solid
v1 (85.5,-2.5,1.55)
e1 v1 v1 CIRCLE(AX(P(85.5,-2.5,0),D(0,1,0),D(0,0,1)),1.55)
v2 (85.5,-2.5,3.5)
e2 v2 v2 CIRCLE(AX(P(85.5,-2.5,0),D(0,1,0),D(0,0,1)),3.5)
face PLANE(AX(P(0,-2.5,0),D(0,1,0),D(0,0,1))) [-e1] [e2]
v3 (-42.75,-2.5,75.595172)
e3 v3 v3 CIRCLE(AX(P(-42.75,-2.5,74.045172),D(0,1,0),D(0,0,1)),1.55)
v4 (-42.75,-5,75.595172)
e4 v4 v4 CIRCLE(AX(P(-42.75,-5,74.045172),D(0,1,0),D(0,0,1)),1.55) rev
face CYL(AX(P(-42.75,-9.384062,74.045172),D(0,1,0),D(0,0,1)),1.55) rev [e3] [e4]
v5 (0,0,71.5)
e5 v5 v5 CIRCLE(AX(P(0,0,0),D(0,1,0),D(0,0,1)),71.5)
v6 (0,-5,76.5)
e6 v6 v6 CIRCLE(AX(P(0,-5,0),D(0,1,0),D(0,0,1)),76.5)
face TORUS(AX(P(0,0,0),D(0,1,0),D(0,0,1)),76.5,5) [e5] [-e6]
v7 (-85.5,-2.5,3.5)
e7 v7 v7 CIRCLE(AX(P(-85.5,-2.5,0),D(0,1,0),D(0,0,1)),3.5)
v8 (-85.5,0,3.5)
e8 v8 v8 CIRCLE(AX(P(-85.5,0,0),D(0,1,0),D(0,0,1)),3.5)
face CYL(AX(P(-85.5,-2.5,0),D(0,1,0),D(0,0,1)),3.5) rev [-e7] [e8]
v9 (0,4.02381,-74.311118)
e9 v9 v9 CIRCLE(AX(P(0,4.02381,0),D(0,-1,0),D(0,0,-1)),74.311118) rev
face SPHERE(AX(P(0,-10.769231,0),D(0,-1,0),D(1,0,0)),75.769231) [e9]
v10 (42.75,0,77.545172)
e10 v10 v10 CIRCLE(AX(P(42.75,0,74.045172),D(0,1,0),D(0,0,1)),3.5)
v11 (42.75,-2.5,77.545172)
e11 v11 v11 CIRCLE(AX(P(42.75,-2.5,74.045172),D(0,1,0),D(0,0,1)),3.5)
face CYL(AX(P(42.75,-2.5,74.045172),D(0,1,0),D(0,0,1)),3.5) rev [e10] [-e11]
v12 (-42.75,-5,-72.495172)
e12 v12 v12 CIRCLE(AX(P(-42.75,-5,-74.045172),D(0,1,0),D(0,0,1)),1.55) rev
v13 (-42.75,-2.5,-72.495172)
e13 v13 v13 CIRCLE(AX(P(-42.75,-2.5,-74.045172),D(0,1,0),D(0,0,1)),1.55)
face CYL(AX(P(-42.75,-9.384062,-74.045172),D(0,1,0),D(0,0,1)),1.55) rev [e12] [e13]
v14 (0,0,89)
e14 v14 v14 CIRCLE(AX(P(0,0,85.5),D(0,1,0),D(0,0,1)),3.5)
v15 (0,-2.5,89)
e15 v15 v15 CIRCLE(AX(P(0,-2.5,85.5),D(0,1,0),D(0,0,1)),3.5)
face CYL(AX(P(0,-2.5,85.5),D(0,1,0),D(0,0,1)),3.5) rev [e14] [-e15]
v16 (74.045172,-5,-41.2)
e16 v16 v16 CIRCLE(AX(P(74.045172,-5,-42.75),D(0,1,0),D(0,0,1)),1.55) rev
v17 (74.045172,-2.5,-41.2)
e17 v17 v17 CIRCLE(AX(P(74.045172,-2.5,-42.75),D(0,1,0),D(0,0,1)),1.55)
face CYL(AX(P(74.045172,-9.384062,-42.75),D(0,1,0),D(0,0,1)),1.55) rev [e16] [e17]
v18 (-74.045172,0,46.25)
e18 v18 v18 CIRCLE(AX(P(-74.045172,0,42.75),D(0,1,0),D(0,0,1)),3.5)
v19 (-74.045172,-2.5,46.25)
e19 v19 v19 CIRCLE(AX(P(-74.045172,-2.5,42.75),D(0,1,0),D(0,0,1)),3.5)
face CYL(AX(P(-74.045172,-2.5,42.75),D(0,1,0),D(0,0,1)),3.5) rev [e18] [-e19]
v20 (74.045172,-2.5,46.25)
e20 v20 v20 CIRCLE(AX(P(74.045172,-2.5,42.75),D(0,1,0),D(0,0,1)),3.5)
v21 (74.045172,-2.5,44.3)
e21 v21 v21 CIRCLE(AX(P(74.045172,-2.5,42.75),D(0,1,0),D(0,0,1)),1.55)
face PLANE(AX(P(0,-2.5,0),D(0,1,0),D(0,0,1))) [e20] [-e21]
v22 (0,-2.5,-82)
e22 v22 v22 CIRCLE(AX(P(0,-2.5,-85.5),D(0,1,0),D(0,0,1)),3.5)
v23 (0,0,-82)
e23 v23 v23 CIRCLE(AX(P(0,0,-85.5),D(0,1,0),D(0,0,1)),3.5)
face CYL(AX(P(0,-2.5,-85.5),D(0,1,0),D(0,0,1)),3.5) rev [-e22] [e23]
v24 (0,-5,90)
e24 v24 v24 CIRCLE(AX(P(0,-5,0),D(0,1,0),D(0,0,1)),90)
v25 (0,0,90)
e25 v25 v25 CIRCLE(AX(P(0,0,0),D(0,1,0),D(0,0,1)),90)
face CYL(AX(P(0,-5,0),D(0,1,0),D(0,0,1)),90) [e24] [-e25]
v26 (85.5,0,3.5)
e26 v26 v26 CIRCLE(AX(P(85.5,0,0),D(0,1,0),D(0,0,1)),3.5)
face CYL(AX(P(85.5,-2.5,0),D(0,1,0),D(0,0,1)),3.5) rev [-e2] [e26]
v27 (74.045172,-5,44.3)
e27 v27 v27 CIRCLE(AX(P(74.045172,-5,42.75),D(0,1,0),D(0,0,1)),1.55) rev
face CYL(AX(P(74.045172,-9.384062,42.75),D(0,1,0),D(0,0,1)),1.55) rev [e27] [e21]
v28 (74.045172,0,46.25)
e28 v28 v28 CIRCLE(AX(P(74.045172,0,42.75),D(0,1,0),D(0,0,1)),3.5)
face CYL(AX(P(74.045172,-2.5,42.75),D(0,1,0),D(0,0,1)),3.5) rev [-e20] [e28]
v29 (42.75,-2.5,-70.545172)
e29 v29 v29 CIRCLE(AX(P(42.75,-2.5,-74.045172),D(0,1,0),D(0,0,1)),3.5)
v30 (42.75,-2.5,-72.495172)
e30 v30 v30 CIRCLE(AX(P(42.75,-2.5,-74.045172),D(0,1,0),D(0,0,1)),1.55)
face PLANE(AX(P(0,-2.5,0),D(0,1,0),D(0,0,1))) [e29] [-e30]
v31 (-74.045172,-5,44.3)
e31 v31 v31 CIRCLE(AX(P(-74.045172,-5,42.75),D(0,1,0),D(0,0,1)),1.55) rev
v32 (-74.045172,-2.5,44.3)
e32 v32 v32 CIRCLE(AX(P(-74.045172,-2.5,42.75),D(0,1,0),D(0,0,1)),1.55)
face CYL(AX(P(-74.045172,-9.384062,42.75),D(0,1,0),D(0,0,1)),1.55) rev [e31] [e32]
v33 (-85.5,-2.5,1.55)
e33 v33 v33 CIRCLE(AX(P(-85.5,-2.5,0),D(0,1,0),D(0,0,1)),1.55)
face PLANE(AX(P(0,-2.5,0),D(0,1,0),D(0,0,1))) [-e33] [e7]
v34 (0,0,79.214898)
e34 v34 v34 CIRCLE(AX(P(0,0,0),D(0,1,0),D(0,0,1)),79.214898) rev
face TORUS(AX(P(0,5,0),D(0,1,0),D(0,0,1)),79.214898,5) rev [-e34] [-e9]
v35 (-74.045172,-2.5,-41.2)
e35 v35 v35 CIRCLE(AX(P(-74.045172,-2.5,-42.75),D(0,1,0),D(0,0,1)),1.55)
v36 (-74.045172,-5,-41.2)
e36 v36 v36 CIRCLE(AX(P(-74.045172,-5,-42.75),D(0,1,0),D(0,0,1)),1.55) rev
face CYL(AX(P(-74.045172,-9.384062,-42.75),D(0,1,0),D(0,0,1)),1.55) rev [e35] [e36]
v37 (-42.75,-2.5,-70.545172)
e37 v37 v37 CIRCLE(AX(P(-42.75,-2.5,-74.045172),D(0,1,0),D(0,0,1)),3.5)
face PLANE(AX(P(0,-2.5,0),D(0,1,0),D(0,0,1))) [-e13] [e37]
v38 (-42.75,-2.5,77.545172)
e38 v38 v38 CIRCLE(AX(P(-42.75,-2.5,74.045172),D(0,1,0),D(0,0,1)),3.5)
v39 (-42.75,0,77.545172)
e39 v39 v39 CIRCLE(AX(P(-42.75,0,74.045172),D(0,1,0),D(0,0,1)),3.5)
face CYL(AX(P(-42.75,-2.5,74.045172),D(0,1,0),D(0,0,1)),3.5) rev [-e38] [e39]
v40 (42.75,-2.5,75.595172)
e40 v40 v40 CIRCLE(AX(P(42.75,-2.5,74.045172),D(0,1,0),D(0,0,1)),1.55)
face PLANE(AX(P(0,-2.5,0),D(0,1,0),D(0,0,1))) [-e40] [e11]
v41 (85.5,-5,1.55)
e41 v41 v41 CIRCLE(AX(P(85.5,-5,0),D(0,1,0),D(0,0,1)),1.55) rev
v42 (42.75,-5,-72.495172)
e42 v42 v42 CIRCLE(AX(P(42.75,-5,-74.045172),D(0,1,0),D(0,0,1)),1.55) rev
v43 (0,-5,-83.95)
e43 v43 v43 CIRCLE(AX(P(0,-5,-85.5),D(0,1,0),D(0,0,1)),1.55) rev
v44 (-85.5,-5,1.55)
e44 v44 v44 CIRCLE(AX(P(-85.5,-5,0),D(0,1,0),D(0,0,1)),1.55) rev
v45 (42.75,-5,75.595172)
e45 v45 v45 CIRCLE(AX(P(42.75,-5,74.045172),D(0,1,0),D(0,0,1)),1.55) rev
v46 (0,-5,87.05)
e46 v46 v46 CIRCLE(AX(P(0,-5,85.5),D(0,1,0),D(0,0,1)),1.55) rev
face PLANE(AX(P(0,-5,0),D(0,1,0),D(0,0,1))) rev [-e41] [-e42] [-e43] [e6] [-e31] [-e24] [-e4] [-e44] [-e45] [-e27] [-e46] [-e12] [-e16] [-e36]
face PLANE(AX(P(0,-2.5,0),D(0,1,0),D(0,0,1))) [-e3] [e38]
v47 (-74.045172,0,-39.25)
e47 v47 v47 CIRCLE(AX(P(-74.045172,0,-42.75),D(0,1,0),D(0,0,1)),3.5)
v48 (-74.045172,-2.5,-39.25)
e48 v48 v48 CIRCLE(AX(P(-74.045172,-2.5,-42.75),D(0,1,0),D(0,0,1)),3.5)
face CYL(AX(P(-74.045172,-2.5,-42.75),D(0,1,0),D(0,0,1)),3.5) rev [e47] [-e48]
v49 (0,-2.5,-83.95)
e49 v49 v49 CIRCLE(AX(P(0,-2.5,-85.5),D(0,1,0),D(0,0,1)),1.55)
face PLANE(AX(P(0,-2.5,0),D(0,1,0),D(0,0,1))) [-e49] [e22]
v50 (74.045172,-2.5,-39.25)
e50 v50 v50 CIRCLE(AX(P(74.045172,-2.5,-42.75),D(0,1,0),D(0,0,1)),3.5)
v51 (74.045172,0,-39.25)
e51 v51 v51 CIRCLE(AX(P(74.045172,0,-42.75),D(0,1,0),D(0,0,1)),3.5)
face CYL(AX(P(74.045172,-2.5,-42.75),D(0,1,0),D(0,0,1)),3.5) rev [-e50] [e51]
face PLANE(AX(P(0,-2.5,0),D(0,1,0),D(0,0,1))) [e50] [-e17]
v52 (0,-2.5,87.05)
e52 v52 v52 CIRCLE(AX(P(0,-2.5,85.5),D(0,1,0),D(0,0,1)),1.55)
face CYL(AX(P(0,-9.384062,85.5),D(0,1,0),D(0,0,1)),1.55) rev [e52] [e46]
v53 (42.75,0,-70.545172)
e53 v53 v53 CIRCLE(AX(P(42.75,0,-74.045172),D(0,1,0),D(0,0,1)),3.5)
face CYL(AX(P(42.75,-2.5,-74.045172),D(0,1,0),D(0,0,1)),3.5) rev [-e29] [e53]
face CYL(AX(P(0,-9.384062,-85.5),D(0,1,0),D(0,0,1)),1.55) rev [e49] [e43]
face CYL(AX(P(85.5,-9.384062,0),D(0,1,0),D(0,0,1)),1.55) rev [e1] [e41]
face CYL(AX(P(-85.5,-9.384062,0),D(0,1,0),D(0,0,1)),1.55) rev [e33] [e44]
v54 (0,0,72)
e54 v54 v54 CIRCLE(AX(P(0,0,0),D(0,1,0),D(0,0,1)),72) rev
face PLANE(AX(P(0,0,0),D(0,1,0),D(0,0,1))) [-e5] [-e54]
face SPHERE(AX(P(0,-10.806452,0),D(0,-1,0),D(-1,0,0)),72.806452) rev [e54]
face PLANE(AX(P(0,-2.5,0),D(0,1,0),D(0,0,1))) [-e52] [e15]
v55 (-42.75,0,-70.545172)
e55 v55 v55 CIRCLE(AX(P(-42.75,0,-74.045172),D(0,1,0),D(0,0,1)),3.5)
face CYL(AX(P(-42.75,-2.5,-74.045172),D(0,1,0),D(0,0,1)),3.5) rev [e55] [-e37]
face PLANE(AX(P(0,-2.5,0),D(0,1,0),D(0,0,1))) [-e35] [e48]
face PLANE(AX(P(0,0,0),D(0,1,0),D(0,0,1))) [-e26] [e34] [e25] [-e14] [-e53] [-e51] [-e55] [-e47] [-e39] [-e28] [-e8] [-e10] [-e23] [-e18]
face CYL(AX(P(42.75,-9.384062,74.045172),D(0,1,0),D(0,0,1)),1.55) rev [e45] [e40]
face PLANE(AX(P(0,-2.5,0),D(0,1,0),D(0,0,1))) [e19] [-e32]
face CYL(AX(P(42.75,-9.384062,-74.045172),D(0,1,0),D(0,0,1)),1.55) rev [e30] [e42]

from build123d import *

# Parameters (mm, degrees)
SKETCH1_R           = 90
SKETCH1_R_2         = 71.5
BOSS_EXTRUDE1_DEPTH = 5
SKETCH1_4_R         = 1.55
CUT_EXTRUDE1_DEPTH  = 5
SKETCH1_5_R         = 3.5
SKETCH1_5_R_2       = 1.55
CUT_EXTRUDE2_DEPTH  = 2.5
FILLET1_R           = 5


with BuildPart() as part:
    # Sketch1 → Boss-Extrude1 (new body)
    with BuildSketch(Plane(origin=(0, 0, 0), x_dir=(1, 0, 0), z_dir=(0, 1, 0))):
        with Locations(Location((0, 0, 0), (0, 0, 270))):
            Circle(SKETCH1_R)
        with Locations(Location((0, 0, 0), (0, 0, 270))):
            Circle(SKETCH1_R_2, mode=Mode.SUBTRACT)
    extrude(amount=-BOSS_EXTRUDE1_DEPTH)

    # Sketch1<4> → Cut-Extrude1 (cut)
    with BuildSketch(Plane(origin=(0, 0, 0), x_dir=(1, 0, 0), z_dir=(0, 1, 0))):
        with Locations(Location((0, -85.5, 0), (0, 0, 270))):
            Circle(SKETCH1_4_R)
        with Locations(Location((-74.045172024, -42.75, 0), (0, 0, 270))):
            Circle(SKETCH1_4_R)
        with Locations(Location((-42.75, -74.045172024, 0), (0, 0, 270))):
            Circle(SKETCH1_4_R)
        with Locations(Location((-85.5, 0, 0), (0, 0, 270))):
            Circle(SKETCH1_4_R)
        with Locations(Location((-74.045172024, 42.75, 0), (0, 0, 270))):
            Circle(SKETCH1_4_R)
        with Locations(Location((-42.75, 74.045172024, 0), (0, 0, 270))):
            Circle(SKETCH1_4_R)
        with Locations(Location((0, 85.5, 0), (0, 0, 270))):
            Circle(SKETCH1_4_R)
        with Locations(Location((42.75, 74.045172024, 0), (0, 0, 270))):
            Circle(SKETCH1_4_R)
        with Locations(Location((74.045172024, 42.75, 0), (0, 0, 270))):
            Circle(SKETCH1_4_R)
        with Locations(Location((85.5, 0, 0), (0, 0, 270))):
            Circle(SKETCH1_4_R)
        with Locations(Location((74.045172024, -42.75, 0), (0, 0, 270))):
            Circle(SKETCH1_4_R)
        with Locations(Location((42.75, -74.045172024, 0), (0, 0, 270))):
            Circle(SKETCH1_4_R)
    extrude(amount=-CUT_EXTRUDE1_DEPTH, mode=Mode.SUBTRACT)

    # Sketch1<5> → Cut-Extrude2 (cut)
    # profile 1 of 12: a face of its own
    with BuildSketch(Plane(origin=(0, 0, 0), x_dir=(1, 0, 0), z_dir=(0, 1, 0))):
        with Locations(Location((-74.045172024, -42.75, 0), (0, 0, 270))):
            Circle(SKETCH1_5_R)
        with Locations(Location((-74.045172024, -42.75, 0), (0, 0, 270))):
            Circle(SKETCH1_5_R_2, mode=Mode.SUBTRACT)
    # profile 2 of 12: a face of its own
    with BuildSketch(Plane(origin=(0, 0, 0), x_dir=(1, 0, 0), z_dir=(0, 1, 0))):
        with Locations(Location((-85.5, 0, 0), (0, 0, 270))):
            Circle(SKETCH1_5_R)
        with Locations(Location((-85.5, 0, 0), (0, 0, 270))):
            Circle(SKETCH1_5_R_2, mode=Mode.SUBTRACT)
    # profile 3 of 12: a face of its own
    with BuildSketch(Plane(origin=(0, 0, 0), x_dir=(1, 0, 0), z_dir=(0, 1, 0))):
        with Locations(Location((-42.75, -74.045172024, 0), (0, 0, 270))):
            Circle(SKETCH1_5_R)
        with Locations(Location((-42.75, -74.045172024, 0), (0, 0, 270))):
            Circle(SKETCH1_5_R_2, mode=Mode.SUBTRACT)
    # profile 4 of 12: a face of its own
    with BuildSketch(Plane(origin=(0, 0, 0), x_dir=(1, 0, 0), z_dir=(0, 1, 0))):
        with Locations(Location((0, -85.5, 0), (0, 0, 270))):
            Circle(SKETCH1_5_R)
        with Locations(Location((0, -85.5, 0), (0, 0, 270))):
            Circle(SKETCH1_5_R_2, mode=Mode.SUBTRACT)
    # profile 5 of 12: a face of its own
    with BuildSketch(Plane(origin=(0, 0, 0), x_dir=(1, 0, 0), z_dir=(0, 1, 0))):
        with Locations(Location((-74.045172024, 42.75, 0), (0, 0, 270))):
            Circle(SKETCH1_5_R)
        with Locations(Location((-74.045172024, 42.75, 0), (0, 0, 270))):
            Circle(SKETCH1_5_R_2, mode=Mode.SUBTRACT)
    # profile 6 of 12: a face of its own
    with BuildSketch(Plane(origin=(0, 0, 0), x_dir=(1, 0, 0), z_dir=(0, 1, 0))):
        with Locations(Location((-42.75, 74.045172024, 0), (0, 0, 270))):
            Circle(SKETCH1_5_R)
        with Locations(Location((-42.75, 74.045172024, 0), (0, 0, 270))):
            Circle(SKETCH1_5_R_2, mode=Mode.SUBTRACT)
    # profile 7 of 12: a face of its own
    with BuildSketch(Plane(origin=(0, 0, 0), x_dir=(1, 0, 0), z_dir=(0, 1, 0))):
        with Locations(Location((0, 85.5, 0), (0, 0, 270))):
            Circle(SKETCH1_5_R)
        with Locations(Location((0, 85.5, 0), (0, 0, 270))):
            Circle(SKETCH1_5_R_2, mode=Mode.SUBTRACT)
    # profile 8 of 12: a face of its own
    with BuildSketch(Plane(origin=(0, 0, 0), x_dir=(1, 0, 0), z_dir=(0, 1, 0))):
        with Locations(Location((74.045172024, 42.75, 0), (0, 0, 270))):
            Circle(SKETCH1_5_R)
        with Locations(Location((74.045172024, 42.75, 0), (0, 0, 270))):
            Circle(SKETCH1_5_R_2, mode=Mode.SUBTRACT)
    # profile 9 of 12: a face of its own
    with BuildSketch(Plane(origin=(0, 0, 0), x_dir=(1, 0, 0), z_dir=(0, 1, 0))):
        with Locations(Location((42.75, 74.045172024, 0), (0, 0, 270))):
            Circle(SKETCH1_5_R)
        with Locations(Location((42.75, 74.045172024, 0), (0, 0, 270))):
            Circle(SKETCH1_5_R_2, mode=Mode.SUBTRACT)
    # profile 10 of 12: a face of its own
    with BuildSketch(Plane(origin=(0, 0, 0), x_dir=(1, 0, 0), z_dir=(0, 1, 0))):
        with Locations(Location((74.045172024, -42.75, 0), (0, 0, 270))):
            Circle(SKETCH1_5_R)
        with Locations(Location((74.045172024, -42.75, 0), (0, 0, 270))):
            Circle(SKETCH1_5_R_2, mode=Mode.SUBTRACT)
    # profile 11 of 12: a face of its own
    with BuildSketch(Plane(origin=(0, 0, 0), x_dir=(1, 0, 0), z_dir=(0, 1, 0))):
        with Locations(Location((85.5, 0, 0), (0, 0, 270))):
            Circle(SKETCH1_5_R)
        with Locations(Location((85.5, 0, 0), (0, 0, 270))):
            Circle(SKETCH1_5_R_2, mode=Mode.SUBTRACT)
    # profile 12 of 12: a face of its own
    with BuildSketch(Plane(origin=(0, 0, 0), x_dir=(1, 0, 0), z_dir=(0, 1, 0))):
        with Locations(Location((42.75, -74.045172024, 0), (0, 0, 270))):
            Circle(SKETCH1_5_R)
        with Locations(Location((42.75, -74.045172024, 0), (0, 0, 270))):
            Circle(SKETCH1_5_R_2, mode=Mode.SUBTRACT)
    extrude(amount=-CUT_EXTRUDE2_DEPTH, mode=Mode.SUBTRACT)

    # Sketch2 → Revolve1 (revolve)
    with BuildSketch(Plane.XY, mode=Mode.PRIVATE) as revolve1_sk:
        with BuildLine():
            Line((0, 65), (0, 62))
            ThreePointArc((0, 62), (47.507894081, 44.364006029), (72, 0))
            Line((72, 0), (75, 0))
            ThreePointArc((75, 0), (49.623583103, 46.488749734), (0, 65))
        make_face()
    revolve(revolve1_sk.sketch.rotate(Axis((0, 0, 0), (0, 1, 0)), 180), axis=Axis((0, 0, 0), (0, 1, 0)))

    # Fillet1
    fillet1_edges = [part.edges().sort_by_distance(p)[0] for p in [
        (75, 0, 0),
        (0, -5, -71.5),
    ]]
    fillet(fillet1_edges, radius=FILLET1_R - 0.0001)  # a hair under: the kernel refuses the full size


solid = part.part
